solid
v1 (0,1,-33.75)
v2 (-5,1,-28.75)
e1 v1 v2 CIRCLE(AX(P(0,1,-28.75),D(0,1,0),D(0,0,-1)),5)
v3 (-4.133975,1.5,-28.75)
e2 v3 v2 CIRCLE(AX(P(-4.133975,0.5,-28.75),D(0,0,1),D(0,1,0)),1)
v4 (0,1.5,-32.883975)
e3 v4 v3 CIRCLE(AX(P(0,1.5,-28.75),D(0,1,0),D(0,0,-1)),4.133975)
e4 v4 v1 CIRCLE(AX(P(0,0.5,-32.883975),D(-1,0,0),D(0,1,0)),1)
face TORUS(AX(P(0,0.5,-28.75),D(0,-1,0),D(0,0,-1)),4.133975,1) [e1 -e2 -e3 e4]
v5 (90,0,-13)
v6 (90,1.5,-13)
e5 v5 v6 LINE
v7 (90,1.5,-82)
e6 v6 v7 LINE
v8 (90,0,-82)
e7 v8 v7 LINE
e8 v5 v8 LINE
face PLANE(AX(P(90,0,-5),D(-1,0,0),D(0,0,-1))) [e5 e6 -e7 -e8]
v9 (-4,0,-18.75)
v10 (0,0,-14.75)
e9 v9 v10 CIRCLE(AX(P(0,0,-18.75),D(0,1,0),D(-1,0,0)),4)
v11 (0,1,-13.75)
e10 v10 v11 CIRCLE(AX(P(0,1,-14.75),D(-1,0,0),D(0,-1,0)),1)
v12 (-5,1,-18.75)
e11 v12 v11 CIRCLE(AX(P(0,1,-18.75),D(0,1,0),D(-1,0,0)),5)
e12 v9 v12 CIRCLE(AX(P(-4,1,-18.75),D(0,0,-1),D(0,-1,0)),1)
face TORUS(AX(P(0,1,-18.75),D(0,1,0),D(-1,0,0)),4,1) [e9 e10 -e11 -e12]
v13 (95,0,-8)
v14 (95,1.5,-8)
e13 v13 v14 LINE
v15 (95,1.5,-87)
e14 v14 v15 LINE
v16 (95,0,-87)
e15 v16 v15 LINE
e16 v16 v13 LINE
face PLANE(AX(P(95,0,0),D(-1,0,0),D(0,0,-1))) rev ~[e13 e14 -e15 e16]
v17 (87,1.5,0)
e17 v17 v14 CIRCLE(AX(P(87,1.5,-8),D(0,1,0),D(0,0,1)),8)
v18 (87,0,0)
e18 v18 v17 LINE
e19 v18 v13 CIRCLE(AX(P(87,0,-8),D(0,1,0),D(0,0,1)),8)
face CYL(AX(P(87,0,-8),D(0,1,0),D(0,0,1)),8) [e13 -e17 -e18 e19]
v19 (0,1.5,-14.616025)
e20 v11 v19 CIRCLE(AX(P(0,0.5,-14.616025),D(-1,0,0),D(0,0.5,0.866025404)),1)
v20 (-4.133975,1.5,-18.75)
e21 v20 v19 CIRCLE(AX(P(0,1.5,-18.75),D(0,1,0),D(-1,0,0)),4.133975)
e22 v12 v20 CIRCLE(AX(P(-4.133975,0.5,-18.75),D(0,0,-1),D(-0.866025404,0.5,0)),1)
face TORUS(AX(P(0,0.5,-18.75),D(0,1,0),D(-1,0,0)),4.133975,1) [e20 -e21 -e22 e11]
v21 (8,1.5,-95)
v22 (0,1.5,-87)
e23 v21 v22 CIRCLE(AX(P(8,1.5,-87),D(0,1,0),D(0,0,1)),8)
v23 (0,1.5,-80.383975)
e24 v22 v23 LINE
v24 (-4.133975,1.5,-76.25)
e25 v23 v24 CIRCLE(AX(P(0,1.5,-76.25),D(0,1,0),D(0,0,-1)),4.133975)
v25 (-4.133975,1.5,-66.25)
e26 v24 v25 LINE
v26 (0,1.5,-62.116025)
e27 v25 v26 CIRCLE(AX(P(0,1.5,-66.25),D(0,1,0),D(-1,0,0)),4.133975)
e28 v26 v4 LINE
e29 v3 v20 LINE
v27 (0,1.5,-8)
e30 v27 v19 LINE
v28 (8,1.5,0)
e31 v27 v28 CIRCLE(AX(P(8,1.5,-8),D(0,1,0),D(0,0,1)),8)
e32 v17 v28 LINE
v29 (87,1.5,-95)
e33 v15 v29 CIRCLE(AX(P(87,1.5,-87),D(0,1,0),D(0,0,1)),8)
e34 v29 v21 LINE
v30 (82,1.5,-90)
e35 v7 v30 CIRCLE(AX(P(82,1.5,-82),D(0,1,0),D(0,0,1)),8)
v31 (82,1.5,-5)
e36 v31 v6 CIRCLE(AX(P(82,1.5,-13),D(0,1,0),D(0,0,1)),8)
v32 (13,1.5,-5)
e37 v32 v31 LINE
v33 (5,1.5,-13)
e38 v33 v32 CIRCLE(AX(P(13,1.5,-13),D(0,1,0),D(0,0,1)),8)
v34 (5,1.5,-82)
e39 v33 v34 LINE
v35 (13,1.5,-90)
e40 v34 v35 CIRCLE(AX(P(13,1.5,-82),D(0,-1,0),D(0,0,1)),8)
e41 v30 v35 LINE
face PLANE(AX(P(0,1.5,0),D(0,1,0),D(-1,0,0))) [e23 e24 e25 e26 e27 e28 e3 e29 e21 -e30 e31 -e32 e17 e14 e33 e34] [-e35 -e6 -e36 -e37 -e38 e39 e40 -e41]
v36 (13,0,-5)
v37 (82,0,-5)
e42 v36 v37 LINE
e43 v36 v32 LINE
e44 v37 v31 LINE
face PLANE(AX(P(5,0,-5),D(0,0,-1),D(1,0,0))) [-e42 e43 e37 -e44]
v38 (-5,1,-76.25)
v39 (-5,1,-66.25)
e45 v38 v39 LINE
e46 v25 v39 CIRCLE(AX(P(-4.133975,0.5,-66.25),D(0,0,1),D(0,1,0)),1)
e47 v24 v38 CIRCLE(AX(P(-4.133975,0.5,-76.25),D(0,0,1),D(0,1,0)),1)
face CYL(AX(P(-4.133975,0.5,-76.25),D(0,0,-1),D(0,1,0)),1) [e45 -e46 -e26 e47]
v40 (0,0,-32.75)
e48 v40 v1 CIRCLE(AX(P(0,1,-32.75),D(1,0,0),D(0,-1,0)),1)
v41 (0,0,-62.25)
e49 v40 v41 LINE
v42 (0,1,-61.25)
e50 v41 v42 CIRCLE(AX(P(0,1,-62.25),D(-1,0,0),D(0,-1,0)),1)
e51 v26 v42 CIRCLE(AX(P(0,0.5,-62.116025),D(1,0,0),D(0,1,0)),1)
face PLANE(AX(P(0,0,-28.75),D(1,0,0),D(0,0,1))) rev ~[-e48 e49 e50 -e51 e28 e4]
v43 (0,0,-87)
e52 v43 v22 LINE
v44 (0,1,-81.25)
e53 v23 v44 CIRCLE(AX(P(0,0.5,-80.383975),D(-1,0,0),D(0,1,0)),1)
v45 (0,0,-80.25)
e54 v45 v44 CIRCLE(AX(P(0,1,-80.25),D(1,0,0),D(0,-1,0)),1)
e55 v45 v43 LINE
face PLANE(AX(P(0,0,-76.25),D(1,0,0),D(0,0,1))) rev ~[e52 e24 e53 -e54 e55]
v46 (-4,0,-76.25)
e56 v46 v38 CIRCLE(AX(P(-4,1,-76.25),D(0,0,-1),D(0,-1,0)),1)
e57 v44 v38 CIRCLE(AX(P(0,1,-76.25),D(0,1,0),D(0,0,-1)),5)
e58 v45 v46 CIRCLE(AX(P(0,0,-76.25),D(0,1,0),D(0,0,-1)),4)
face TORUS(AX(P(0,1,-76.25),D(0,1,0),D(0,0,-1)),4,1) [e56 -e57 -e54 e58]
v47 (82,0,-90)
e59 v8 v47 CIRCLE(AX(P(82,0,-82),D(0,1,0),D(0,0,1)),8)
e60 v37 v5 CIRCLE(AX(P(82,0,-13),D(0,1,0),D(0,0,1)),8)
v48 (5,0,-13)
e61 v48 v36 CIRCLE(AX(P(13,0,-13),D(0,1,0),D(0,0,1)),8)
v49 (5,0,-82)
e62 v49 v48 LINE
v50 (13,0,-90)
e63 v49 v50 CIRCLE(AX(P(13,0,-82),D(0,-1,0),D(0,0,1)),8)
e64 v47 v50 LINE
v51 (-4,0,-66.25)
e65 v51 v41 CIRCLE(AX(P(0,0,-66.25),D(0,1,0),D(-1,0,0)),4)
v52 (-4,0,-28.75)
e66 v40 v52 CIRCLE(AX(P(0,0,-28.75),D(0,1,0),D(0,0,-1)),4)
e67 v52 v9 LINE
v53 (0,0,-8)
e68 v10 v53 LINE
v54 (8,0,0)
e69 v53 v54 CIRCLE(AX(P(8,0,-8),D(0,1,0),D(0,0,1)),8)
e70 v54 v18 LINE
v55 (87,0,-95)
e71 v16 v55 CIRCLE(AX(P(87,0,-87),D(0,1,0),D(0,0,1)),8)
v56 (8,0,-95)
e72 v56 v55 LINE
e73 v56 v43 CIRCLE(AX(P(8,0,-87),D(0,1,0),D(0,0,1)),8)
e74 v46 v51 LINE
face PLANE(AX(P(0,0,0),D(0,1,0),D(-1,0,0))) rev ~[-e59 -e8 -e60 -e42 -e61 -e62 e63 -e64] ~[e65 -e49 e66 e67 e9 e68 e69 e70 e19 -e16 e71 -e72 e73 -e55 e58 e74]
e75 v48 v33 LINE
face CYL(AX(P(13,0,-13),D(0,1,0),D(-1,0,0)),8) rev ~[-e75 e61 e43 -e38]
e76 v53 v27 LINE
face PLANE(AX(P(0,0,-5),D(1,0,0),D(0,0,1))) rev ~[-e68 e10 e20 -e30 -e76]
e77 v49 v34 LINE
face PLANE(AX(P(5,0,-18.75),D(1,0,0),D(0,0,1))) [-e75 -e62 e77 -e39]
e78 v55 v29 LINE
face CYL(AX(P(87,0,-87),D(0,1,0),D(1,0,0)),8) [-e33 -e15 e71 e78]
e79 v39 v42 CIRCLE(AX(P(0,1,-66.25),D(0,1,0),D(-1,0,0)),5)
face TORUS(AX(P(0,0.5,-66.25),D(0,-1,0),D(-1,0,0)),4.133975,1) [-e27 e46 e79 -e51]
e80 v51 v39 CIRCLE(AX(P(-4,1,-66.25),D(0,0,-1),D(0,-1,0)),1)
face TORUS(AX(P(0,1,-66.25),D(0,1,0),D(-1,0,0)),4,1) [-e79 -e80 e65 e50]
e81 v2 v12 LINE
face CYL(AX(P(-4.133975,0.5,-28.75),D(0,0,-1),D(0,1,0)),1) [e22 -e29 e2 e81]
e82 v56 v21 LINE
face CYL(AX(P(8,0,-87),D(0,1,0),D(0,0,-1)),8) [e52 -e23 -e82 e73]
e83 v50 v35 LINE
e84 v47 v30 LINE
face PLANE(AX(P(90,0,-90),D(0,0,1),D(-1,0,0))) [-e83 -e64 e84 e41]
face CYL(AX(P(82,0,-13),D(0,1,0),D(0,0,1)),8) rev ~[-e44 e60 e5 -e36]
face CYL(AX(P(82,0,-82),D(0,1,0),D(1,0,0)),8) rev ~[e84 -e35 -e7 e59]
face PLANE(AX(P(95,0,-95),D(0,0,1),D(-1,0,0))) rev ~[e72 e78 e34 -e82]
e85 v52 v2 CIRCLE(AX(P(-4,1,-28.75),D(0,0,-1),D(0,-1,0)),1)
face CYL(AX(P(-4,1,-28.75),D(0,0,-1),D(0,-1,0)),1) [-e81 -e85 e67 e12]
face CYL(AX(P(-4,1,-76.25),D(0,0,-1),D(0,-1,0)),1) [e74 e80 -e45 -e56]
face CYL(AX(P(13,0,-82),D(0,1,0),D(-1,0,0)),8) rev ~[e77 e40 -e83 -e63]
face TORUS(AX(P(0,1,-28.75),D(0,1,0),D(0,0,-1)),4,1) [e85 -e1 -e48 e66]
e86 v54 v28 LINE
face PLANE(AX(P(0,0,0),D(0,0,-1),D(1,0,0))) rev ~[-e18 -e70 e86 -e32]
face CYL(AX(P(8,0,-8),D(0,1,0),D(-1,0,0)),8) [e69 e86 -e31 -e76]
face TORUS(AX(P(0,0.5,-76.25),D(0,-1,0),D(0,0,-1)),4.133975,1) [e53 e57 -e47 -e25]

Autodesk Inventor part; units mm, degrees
ref_plane "YZ Plane" through (0, 0, 0) normal (1, 0, 0) x (0, 1, 0)
ref_plane "XZ Plane" through (0, 0, 0) normal (0, 1, 0) x (-1, 0, 0)
ref_plane "XY Plane" through (0, 0, 0) normal (0, 0, 1) x (1, 0, 0)
sketch "Sketch1" plane through (0, 0, 0) normal (0, 1, 0) x (-1, 0, 0)
  line L0 (0, 0) -> (-95, 0)
  line L1 (-95, 0) -> (-95, -95)
  line L2 (-95, -95) -> (0, -95)
  line L3 (0, -95) -> (0, 0)
  line L4 (0, 0) -> (-5, 0)
  line L5 (-5, 0) -> (-5, -5)
  line L6 (-5, -5) -> (0, -5)
  line L7 (0, -5) -> (0, 0)
  line L8 (-95, -95) -> (-90, -95)
  line L9 (-90, -95) -> (-90, -90)
  line L10 (-90, -90) -> (-95, -90)
  line L11 (-95, -90) -> (-95, -95)
  line L12 (-90, -90) -> (-5, -90)
  line L13 (-5, -90) -> (-5, -5)
  line L14 (-5, -5) -> (-90, -5)
  line L15 (-90, -5) -> (-90, -90)
  line L16 (0, -47.5) -> (0, 0)
  line L17 (0, -47.5) -> (0, -95)
  line L18 (0, -23.75) -> (0, -18.75)
  line L19 (0, -18.75) -> (0, -28.75)
  line L20 (0, -71.25) -> (0, -76.25)
  line L21 (0, -76.25) -> (0, -66.25)
  line L22 (0, -18.75) -> (0, -28.75) construction
  line L23 (-5, -18.75) -> (-5, -28.75)
  line L24 (5, -28.75) -> (5, -18.75)
  arc A0 (5, -18.75) -> (-5, -18.75) centre (0, -18.75) ccw
  arc A1 (-5, -28.75) -> (5, -28.75) centre (0, -28.75) ccw
  line L25 (0, -66.25) -> (0, -76.25) construction
  line L26 (-5, -66.25) -> (-5, -76.25)
  line L27 (5, -76.25) -> (5, -66.25)
  arc A2 (5, -66.25) -> (-5, -66.25) centre (0, -66.25) ccw
  arc A3 (-5, -76.25) -> (5, -76.25) centre (0, -76.25) ccw
  point P0 (0, -61.25)
  point P1 (0, -81.25)
  point P2 (0, -13.75)
  point P3 (0, -33.75)
  dimension "d0" = 95
  dimension "d1" = 95
  dimension "d2" = 5
  dimension "d3" = 5
  dimension "d4" = 5
  dimension "d5" = 5
  dimension "d8" = 5
  dimension "d9" = 10
  dimension "d10" = 5
  dimension "d11" = 10
  dimension "d12" = 10
  dimension "d13" = 10
extrude "Extrusion1" add sketch "Sketch1" along normal blind 1.5 contours L3 L6 L5 L0 | L5 L14 L15 L10 L1 L0 | L3 A0 L13 L6 | A0 L24 A1 L3 | L3 A1 L13 A0 | L10 L9 L2 L1 | L12 L13 A3 L3 L2 L9 | A1 L3 A2 L13 | A2 L3 A3 L13 | A2 L27 A3 L3
fillet "Fillet1" radius 8 8 edges at (5, 0.75, -5) (0, 0.75, 0) (0, 0.75, -95) (5, 0.75, -90) (95, 0.75, 0) (90, 0.75, -5) (95, 0.75, -95) (90, 0.75, -90)
fillet "Fillet2" radius 1 12 edges at (-3.5355, 0, -15.2145) (-3.5355, 0, -32.2855) (-5, 0, -23.75) (-3.5355, 1.5, -15.2145) (-3.5355, 1.5, -32.2855) (-5, 1.5, -23.75) (-3.5355, 0, -62.7145) (-3.5355, 0, -79.7855) (-5, 0, -71.25) (-3.5355, 1.5, -62.7145) (-3.5355, 1.5, -79.7855) (-5, 1.5, -71.25)
properties part number "Plate"
